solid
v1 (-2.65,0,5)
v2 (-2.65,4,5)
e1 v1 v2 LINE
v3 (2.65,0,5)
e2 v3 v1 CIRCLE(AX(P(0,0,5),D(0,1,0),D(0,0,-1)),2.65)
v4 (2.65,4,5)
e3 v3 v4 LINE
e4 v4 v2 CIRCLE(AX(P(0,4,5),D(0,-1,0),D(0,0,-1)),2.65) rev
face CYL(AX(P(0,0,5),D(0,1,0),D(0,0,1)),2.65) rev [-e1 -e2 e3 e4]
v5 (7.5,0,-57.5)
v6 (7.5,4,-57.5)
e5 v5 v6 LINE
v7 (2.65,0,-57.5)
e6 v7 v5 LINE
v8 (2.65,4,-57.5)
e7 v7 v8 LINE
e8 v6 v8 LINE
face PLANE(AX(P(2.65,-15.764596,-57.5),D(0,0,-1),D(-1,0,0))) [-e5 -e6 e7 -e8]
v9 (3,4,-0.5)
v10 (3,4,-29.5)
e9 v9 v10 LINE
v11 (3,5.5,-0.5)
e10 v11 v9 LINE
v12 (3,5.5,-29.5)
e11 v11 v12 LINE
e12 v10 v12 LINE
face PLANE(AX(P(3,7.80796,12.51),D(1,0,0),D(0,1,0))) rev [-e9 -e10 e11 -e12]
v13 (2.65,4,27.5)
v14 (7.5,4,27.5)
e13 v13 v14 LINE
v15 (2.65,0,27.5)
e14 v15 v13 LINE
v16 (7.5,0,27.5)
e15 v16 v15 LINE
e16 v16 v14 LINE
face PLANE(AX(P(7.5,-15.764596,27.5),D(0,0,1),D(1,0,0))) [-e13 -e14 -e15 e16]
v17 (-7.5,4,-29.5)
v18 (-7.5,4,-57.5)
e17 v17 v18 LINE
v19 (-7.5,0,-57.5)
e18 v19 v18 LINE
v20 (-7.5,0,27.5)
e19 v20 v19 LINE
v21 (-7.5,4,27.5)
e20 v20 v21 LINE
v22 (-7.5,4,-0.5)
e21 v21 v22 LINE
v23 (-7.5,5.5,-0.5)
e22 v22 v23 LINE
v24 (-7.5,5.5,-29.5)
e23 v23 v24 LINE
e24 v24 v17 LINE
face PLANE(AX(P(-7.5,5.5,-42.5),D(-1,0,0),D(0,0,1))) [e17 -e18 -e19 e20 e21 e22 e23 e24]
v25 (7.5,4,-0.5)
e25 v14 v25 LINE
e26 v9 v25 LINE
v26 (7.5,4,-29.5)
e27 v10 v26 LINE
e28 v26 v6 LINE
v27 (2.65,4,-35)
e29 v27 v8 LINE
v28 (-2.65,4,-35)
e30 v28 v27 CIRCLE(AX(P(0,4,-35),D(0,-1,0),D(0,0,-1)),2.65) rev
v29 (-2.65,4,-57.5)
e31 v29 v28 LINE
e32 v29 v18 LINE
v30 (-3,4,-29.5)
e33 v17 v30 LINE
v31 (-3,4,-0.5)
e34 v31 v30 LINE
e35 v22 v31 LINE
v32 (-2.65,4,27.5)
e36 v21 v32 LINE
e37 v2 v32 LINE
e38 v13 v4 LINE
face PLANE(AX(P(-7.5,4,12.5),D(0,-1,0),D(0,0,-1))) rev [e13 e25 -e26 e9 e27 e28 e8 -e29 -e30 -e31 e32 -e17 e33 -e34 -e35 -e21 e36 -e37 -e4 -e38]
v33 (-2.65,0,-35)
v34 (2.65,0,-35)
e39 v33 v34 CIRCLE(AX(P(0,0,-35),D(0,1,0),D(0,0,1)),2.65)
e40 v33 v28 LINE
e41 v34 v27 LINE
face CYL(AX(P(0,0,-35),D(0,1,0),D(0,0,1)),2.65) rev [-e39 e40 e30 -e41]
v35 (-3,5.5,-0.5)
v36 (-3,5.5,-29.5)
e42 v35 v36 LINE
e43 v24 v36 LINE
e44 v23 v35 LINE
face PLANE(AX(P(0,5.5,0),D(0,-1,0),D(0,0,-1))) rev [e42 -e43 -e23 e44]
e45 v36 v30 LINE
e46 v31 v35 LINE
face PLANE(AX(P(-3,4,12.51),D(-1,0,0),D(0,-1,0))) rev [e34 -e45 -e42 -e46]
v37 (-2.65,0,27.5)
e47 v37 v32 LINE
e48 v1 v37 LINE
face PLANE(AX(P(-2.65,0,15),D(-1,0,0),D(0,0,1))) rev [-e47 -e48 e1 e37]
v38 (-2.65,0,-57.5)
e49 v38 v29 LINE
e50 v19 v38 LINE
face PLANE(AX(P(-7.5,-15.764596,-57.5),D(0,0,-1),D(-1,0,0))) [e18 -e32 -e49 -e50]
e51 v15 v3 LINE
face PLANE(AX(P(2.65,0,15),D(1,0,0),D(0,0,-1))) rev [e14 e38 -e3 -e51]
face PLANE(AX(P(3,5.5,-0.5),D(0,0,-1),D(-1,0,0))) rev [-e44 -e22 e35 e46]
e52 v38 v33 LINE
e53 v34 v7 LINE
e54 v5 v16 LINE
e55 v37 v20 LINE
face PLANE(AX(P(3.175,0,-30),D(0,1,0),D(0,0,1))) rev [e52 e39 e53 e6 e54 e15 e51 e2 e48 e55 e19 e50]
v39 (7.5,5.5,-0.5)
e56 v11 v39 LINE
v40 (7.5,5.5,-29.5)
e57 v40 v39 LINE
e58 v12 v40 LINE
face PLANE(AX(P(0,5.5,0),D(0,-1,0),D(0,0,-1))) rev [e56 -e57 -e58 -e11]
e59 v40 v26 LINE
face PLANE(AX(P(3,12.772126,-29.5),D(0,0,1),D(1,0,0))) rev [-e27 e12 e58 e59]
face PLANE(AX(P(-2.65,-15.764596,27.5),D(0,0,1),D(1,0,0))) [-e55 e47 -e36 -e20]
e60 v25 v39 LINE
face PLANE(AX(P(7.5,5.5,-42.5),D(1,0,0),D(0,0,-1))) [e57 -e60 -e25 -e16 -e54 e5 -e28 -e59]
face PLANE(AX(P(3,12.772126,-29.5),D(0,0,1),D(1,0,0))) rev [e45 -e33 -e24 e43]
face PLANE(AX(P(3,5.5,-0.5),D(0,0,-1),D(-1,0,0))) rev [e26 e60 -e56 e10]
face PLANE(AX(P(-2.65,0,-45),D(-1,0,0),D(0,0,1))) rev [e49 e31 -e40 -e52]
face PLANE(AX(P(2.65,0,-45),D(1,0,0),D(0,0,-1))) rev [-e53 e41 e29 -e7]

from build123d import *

# Parameters (mm, degrees)
BOSS_EXTRUDE1_DEPTH    = 3.175
SKETCH2_W              = 15
SKETCH2_H              = 55
BOSS_EXTRUDE2_DEPTH    = 5.5
CUT_EXTRUDE1_DEPTH     = 47.569840025
FILLET1_R              = 20
SKETCH6_W              = 31.616763165
SKETCH6_H              = 17.5
CUT_EXTRUDE3_DEPTH     = 50.489449633
BOSS_EXTRUDE4_DEPTH    = 3
FILLET3_R              = 5
SKETCH9_W              = 13
SKETCH9_H              = 1.5
CUT_EXTRUDE4_DEPTH     = 51.855333187
SPLIT1_SURFACE_1_BACK  = 62.685
SPLIT1_SURFACE_1_DEPTH = 125.37
SPLIT1_SURFACE_2_BACK  = 62.685
SPLIT1_SURFACE_2_DEPTH = 125.37
SKETCH12_W             = 4.85
SKETCH12_H             = 15
BOSS_EXTRUDE5_DEPTH    = 4


with BuildPart() as part:
    # Sketch1 → Boss-Extrude1 (new, symmetric)
    with BuildSketch(Plane(origin=(0, 0, 0), x_dir=(0, 0, -1), z_dir=(1, 0, 0))):
        Polygon((0, 0), (0, 23), (20, 23), (30, 6), (30, 0), align=None)
    extrude(amount=BOSS_EXTRUDE1_DEPTH, both=True)

    # Sketch2 → Boss-Extrude2 (add)
    with BuildSketch(Plane.XZ):
        with Locations((0, -15)):
            Rectangle(SKETCH2_W, SKETCH2_H)
    extrude(amount=-BOSS_EXTRUDE2_DEPTH)

    # Sketch3 → Cut-Extrude1 (cut, through all)
    with BuildSketch(Plane(origin=(0, 5.5, 0), x_dir=(1, 0, 0), z_dir=(0, 1, 0))):
        with BuildLine():
            Line((2.65, 45), (2.65, 35))
            ThreePointArc((2.65, 35), (0, 32.35), (-2.65, 35))
            Line((-2.65, 35), (-2.65, 45))
            ThreePointArc((-2.65, 45), (0, 47.65), (2.65, 45))
        make_face()
        with BuildLine():
            Line((2.65, -15), (2.65, -5))
            ThreePointArc((2.65, -5), (0, -2.35), (-2.65, -5))
            Line((-2.65, -5), (-2.65, -15))
            ThreePointArc((-2.65, -15), (0, -17.65), (2.65, -15))
        make_face()
    extrude(amount=-CUT_EXTRUDE1_DEPTH, mode=Mode.SUBTRACT)

    # Fillet1
    fillet1_edges = [part.edges().sort_by_distance(p)[0] for p in [
        (0, 23, -20),
    ]]
    fillet(fillet1_edges, radius=FILLET1_R)

    # Sketch6 → Cut-Extrude3 (cut, through all)
    with BuildSketch(Plane(origin=(3.175, 0, 0), x_dir=(0, 0, -1), z_dir=(1, 0, 0))):
        with Locations((15.808381583, 14.25)):
            Rectangle(SKETCH6_W, SKETCH6_H)
    extrude(amount=-CUT_EXTRUDE3_DEPTH, mode=Mode.SUBTRACT)

    # Sketch7 → Boss-Extrude4 (add, symmetric)
    with BuildSketch(Plane(origin=(0, 0, 0), x_dir=(0, 0, -1), z_dir=(1, 0, 0))):
        Polygon((0.5, 5.5), (0.5, 15.105993457), (24.253814646, 15.105993457), (24.253814646, 23.558754498), (33.902459411, 23.558754498), (33.902459411, 12.772125994), (29.5, 12.772125994), (29.5, 5.5), (15, 5.5), align=None)
    extrude(amount=BOSS_EXTRUDE4_DEPTH, both=True)

    # Fillet3
    # the kernel refuses this fillet: 5 mm, written as the material it adds along each edge
    with BuildSketch(Plane(origin=(3, 12.772125994, -29.5), x_dir=(0, -1, 0), z_dir=(-1, 0, 0))) as fillet3_piece_1:
        with BuildLine():
            CenterArc((4.964166118, -5), FILLET3_R, 90, 83.136284475)
            Line((0, -4.402459411), (0, 0))
            Line((0, 0), (4.964166118, 0))
        make_face()
    extrude(amount=6)
    with BuildSketch(Plane(origin=(3, 15.105993457, -24.253814646), x_dir=(0, 0, 1), z_dir=(-1, 0, 0))) as fillet3_piece_2:
        with BuildLine():
            CenterArc((FILLET3_R, FILLET3_R), FILLET3_R, 180, 90)
            Line((0, FILLET3_R), (0, 0))
            Line((0, 0), (FILLET3_R, 0))
        make_face()
    extrude(amount=6)
    # the kernel refuses this fillet: 5 mm, written as the material it takes off along each edge
    with BuildSketch(Plane(origin=(15.5, 15.105993457, -0.5), x_dir=(0, -1, 0), z_dir=(-1, 0, 0))) as fillet3_2_piece_1:
        with BuildLine():
            CenterArc((FILLET3_R, -FILLET3_R), FILLET3_R, 90, 90)
            Line((0, -FILLET3_R), (0, 0))
            Line((0, 0), (FILLET3_R, 0))
        make_face()
    extrude(amount=31, mode=Mode.SUBTRACT)

    # Sketch9 → Cut-Extrude4 (cut, through all)
    with BuildSketch(Plane(origin=(7.5, 0, 0), x_dir=(0, 0, -1), z_dir=(1, 0, 0))):
        with Locations((-6, 4.75)):
            Rectangle(SKETCH9_W, SKETCH9_H)
        with Locations((36, 4.75)):
            Rectangle(SKETCH9_W, SKETCH9_H)
    extrude(amount=-CUT_EXTRUDE4_DEPTH, mode=Mode.SUBTRACT)


with BuildPart() as body_2:
    # Split1: the piece behind the surface
    add(part.part)
    # Split1 surface: a surface, the sketch's curves swept straight by 125.37 mm
    with BuildLine(Plane(origin=(0, 0, -29.5), x_dir=(-1, 0, 0), z_dir=(0, 0, -1)).offset(-SPLIT1_SURFACE_1_BACK), mode=Mode.PRIVATE) as split1_surface_1_path:
        Line((-3, 7.807959877), (-3, 4))
        Line((-3, 4), (3, 4))
        Line((3, 4), (3, 7.807959877))
    split1_surface_1 = Shell.extrude(split1_surface_1_path.wire(), (0 * SPLIT1_SURFACE_1_DEPTH, 0 * SPLIT1_SURFACE_1_DEPTH, -1 * SPLIT1_SURFACE_1_DEPTH))
    split(bisect_by=split1_surface_1, keep=Keep.BOTTOM)

    # Sketch12 → Boss-Extrude5 (add)
    with BuildSketch(Plane(origin=(0, 4, 0), x_dir=(1, 0, 0), z_dir=(0, 1, 0))):
        with Locations((-5.075, 50)):
            Rectangle(SKETCH12_W, SKETCH12_H)
        with Locations((5.075, 50)):
            Rectangle(SKETCH12_W, SKETCH12_H)
        with Locations((-5.075, -20)):
            Rectangle(SKETCH12_W, SKETCH12_H)
        with Locations((5.075, -20)):
            Rectangle(SKETCH12_W, SKETCH12_H)
    extrude(amount=-BOSS_EXTRUDE5_DEPTH)


with BuildPart() as part_1:
    add(part.part)

    # Split1: split by a surface, the side it looks to stays
    # Split1 surface: a surface, the sketch's curves swept straight by 125.37 mm
    with BuildLine(Plane(origin=(0, 0, -29.5), x_dir=(-1, 0, 0), z_dir=(0, 0, -1)).offset(-SPLIT1_SURFACE_2_BACK), mode=Mode.PRIVATE) as split1_surface_2_path:
        Line((-3, 7.807959877), (-3, 4))
        Line((-3, 4), (3, 4))
        Line((3, 4), (3, 7.807959877))
    split1_surface_2 = Shell.extrude(split1_surface_2_path.wire(), (0 * SPLIT1_SURFACE_2_DEPTH, 0 * SPLIT1_SURFACE_2_DEPTH, -1 * SPLIT1_SURFACE_2_DEPTH))
    split(bisect_by=split1_surface_2, keep=Keep.TOP)


solid = body_2.part
